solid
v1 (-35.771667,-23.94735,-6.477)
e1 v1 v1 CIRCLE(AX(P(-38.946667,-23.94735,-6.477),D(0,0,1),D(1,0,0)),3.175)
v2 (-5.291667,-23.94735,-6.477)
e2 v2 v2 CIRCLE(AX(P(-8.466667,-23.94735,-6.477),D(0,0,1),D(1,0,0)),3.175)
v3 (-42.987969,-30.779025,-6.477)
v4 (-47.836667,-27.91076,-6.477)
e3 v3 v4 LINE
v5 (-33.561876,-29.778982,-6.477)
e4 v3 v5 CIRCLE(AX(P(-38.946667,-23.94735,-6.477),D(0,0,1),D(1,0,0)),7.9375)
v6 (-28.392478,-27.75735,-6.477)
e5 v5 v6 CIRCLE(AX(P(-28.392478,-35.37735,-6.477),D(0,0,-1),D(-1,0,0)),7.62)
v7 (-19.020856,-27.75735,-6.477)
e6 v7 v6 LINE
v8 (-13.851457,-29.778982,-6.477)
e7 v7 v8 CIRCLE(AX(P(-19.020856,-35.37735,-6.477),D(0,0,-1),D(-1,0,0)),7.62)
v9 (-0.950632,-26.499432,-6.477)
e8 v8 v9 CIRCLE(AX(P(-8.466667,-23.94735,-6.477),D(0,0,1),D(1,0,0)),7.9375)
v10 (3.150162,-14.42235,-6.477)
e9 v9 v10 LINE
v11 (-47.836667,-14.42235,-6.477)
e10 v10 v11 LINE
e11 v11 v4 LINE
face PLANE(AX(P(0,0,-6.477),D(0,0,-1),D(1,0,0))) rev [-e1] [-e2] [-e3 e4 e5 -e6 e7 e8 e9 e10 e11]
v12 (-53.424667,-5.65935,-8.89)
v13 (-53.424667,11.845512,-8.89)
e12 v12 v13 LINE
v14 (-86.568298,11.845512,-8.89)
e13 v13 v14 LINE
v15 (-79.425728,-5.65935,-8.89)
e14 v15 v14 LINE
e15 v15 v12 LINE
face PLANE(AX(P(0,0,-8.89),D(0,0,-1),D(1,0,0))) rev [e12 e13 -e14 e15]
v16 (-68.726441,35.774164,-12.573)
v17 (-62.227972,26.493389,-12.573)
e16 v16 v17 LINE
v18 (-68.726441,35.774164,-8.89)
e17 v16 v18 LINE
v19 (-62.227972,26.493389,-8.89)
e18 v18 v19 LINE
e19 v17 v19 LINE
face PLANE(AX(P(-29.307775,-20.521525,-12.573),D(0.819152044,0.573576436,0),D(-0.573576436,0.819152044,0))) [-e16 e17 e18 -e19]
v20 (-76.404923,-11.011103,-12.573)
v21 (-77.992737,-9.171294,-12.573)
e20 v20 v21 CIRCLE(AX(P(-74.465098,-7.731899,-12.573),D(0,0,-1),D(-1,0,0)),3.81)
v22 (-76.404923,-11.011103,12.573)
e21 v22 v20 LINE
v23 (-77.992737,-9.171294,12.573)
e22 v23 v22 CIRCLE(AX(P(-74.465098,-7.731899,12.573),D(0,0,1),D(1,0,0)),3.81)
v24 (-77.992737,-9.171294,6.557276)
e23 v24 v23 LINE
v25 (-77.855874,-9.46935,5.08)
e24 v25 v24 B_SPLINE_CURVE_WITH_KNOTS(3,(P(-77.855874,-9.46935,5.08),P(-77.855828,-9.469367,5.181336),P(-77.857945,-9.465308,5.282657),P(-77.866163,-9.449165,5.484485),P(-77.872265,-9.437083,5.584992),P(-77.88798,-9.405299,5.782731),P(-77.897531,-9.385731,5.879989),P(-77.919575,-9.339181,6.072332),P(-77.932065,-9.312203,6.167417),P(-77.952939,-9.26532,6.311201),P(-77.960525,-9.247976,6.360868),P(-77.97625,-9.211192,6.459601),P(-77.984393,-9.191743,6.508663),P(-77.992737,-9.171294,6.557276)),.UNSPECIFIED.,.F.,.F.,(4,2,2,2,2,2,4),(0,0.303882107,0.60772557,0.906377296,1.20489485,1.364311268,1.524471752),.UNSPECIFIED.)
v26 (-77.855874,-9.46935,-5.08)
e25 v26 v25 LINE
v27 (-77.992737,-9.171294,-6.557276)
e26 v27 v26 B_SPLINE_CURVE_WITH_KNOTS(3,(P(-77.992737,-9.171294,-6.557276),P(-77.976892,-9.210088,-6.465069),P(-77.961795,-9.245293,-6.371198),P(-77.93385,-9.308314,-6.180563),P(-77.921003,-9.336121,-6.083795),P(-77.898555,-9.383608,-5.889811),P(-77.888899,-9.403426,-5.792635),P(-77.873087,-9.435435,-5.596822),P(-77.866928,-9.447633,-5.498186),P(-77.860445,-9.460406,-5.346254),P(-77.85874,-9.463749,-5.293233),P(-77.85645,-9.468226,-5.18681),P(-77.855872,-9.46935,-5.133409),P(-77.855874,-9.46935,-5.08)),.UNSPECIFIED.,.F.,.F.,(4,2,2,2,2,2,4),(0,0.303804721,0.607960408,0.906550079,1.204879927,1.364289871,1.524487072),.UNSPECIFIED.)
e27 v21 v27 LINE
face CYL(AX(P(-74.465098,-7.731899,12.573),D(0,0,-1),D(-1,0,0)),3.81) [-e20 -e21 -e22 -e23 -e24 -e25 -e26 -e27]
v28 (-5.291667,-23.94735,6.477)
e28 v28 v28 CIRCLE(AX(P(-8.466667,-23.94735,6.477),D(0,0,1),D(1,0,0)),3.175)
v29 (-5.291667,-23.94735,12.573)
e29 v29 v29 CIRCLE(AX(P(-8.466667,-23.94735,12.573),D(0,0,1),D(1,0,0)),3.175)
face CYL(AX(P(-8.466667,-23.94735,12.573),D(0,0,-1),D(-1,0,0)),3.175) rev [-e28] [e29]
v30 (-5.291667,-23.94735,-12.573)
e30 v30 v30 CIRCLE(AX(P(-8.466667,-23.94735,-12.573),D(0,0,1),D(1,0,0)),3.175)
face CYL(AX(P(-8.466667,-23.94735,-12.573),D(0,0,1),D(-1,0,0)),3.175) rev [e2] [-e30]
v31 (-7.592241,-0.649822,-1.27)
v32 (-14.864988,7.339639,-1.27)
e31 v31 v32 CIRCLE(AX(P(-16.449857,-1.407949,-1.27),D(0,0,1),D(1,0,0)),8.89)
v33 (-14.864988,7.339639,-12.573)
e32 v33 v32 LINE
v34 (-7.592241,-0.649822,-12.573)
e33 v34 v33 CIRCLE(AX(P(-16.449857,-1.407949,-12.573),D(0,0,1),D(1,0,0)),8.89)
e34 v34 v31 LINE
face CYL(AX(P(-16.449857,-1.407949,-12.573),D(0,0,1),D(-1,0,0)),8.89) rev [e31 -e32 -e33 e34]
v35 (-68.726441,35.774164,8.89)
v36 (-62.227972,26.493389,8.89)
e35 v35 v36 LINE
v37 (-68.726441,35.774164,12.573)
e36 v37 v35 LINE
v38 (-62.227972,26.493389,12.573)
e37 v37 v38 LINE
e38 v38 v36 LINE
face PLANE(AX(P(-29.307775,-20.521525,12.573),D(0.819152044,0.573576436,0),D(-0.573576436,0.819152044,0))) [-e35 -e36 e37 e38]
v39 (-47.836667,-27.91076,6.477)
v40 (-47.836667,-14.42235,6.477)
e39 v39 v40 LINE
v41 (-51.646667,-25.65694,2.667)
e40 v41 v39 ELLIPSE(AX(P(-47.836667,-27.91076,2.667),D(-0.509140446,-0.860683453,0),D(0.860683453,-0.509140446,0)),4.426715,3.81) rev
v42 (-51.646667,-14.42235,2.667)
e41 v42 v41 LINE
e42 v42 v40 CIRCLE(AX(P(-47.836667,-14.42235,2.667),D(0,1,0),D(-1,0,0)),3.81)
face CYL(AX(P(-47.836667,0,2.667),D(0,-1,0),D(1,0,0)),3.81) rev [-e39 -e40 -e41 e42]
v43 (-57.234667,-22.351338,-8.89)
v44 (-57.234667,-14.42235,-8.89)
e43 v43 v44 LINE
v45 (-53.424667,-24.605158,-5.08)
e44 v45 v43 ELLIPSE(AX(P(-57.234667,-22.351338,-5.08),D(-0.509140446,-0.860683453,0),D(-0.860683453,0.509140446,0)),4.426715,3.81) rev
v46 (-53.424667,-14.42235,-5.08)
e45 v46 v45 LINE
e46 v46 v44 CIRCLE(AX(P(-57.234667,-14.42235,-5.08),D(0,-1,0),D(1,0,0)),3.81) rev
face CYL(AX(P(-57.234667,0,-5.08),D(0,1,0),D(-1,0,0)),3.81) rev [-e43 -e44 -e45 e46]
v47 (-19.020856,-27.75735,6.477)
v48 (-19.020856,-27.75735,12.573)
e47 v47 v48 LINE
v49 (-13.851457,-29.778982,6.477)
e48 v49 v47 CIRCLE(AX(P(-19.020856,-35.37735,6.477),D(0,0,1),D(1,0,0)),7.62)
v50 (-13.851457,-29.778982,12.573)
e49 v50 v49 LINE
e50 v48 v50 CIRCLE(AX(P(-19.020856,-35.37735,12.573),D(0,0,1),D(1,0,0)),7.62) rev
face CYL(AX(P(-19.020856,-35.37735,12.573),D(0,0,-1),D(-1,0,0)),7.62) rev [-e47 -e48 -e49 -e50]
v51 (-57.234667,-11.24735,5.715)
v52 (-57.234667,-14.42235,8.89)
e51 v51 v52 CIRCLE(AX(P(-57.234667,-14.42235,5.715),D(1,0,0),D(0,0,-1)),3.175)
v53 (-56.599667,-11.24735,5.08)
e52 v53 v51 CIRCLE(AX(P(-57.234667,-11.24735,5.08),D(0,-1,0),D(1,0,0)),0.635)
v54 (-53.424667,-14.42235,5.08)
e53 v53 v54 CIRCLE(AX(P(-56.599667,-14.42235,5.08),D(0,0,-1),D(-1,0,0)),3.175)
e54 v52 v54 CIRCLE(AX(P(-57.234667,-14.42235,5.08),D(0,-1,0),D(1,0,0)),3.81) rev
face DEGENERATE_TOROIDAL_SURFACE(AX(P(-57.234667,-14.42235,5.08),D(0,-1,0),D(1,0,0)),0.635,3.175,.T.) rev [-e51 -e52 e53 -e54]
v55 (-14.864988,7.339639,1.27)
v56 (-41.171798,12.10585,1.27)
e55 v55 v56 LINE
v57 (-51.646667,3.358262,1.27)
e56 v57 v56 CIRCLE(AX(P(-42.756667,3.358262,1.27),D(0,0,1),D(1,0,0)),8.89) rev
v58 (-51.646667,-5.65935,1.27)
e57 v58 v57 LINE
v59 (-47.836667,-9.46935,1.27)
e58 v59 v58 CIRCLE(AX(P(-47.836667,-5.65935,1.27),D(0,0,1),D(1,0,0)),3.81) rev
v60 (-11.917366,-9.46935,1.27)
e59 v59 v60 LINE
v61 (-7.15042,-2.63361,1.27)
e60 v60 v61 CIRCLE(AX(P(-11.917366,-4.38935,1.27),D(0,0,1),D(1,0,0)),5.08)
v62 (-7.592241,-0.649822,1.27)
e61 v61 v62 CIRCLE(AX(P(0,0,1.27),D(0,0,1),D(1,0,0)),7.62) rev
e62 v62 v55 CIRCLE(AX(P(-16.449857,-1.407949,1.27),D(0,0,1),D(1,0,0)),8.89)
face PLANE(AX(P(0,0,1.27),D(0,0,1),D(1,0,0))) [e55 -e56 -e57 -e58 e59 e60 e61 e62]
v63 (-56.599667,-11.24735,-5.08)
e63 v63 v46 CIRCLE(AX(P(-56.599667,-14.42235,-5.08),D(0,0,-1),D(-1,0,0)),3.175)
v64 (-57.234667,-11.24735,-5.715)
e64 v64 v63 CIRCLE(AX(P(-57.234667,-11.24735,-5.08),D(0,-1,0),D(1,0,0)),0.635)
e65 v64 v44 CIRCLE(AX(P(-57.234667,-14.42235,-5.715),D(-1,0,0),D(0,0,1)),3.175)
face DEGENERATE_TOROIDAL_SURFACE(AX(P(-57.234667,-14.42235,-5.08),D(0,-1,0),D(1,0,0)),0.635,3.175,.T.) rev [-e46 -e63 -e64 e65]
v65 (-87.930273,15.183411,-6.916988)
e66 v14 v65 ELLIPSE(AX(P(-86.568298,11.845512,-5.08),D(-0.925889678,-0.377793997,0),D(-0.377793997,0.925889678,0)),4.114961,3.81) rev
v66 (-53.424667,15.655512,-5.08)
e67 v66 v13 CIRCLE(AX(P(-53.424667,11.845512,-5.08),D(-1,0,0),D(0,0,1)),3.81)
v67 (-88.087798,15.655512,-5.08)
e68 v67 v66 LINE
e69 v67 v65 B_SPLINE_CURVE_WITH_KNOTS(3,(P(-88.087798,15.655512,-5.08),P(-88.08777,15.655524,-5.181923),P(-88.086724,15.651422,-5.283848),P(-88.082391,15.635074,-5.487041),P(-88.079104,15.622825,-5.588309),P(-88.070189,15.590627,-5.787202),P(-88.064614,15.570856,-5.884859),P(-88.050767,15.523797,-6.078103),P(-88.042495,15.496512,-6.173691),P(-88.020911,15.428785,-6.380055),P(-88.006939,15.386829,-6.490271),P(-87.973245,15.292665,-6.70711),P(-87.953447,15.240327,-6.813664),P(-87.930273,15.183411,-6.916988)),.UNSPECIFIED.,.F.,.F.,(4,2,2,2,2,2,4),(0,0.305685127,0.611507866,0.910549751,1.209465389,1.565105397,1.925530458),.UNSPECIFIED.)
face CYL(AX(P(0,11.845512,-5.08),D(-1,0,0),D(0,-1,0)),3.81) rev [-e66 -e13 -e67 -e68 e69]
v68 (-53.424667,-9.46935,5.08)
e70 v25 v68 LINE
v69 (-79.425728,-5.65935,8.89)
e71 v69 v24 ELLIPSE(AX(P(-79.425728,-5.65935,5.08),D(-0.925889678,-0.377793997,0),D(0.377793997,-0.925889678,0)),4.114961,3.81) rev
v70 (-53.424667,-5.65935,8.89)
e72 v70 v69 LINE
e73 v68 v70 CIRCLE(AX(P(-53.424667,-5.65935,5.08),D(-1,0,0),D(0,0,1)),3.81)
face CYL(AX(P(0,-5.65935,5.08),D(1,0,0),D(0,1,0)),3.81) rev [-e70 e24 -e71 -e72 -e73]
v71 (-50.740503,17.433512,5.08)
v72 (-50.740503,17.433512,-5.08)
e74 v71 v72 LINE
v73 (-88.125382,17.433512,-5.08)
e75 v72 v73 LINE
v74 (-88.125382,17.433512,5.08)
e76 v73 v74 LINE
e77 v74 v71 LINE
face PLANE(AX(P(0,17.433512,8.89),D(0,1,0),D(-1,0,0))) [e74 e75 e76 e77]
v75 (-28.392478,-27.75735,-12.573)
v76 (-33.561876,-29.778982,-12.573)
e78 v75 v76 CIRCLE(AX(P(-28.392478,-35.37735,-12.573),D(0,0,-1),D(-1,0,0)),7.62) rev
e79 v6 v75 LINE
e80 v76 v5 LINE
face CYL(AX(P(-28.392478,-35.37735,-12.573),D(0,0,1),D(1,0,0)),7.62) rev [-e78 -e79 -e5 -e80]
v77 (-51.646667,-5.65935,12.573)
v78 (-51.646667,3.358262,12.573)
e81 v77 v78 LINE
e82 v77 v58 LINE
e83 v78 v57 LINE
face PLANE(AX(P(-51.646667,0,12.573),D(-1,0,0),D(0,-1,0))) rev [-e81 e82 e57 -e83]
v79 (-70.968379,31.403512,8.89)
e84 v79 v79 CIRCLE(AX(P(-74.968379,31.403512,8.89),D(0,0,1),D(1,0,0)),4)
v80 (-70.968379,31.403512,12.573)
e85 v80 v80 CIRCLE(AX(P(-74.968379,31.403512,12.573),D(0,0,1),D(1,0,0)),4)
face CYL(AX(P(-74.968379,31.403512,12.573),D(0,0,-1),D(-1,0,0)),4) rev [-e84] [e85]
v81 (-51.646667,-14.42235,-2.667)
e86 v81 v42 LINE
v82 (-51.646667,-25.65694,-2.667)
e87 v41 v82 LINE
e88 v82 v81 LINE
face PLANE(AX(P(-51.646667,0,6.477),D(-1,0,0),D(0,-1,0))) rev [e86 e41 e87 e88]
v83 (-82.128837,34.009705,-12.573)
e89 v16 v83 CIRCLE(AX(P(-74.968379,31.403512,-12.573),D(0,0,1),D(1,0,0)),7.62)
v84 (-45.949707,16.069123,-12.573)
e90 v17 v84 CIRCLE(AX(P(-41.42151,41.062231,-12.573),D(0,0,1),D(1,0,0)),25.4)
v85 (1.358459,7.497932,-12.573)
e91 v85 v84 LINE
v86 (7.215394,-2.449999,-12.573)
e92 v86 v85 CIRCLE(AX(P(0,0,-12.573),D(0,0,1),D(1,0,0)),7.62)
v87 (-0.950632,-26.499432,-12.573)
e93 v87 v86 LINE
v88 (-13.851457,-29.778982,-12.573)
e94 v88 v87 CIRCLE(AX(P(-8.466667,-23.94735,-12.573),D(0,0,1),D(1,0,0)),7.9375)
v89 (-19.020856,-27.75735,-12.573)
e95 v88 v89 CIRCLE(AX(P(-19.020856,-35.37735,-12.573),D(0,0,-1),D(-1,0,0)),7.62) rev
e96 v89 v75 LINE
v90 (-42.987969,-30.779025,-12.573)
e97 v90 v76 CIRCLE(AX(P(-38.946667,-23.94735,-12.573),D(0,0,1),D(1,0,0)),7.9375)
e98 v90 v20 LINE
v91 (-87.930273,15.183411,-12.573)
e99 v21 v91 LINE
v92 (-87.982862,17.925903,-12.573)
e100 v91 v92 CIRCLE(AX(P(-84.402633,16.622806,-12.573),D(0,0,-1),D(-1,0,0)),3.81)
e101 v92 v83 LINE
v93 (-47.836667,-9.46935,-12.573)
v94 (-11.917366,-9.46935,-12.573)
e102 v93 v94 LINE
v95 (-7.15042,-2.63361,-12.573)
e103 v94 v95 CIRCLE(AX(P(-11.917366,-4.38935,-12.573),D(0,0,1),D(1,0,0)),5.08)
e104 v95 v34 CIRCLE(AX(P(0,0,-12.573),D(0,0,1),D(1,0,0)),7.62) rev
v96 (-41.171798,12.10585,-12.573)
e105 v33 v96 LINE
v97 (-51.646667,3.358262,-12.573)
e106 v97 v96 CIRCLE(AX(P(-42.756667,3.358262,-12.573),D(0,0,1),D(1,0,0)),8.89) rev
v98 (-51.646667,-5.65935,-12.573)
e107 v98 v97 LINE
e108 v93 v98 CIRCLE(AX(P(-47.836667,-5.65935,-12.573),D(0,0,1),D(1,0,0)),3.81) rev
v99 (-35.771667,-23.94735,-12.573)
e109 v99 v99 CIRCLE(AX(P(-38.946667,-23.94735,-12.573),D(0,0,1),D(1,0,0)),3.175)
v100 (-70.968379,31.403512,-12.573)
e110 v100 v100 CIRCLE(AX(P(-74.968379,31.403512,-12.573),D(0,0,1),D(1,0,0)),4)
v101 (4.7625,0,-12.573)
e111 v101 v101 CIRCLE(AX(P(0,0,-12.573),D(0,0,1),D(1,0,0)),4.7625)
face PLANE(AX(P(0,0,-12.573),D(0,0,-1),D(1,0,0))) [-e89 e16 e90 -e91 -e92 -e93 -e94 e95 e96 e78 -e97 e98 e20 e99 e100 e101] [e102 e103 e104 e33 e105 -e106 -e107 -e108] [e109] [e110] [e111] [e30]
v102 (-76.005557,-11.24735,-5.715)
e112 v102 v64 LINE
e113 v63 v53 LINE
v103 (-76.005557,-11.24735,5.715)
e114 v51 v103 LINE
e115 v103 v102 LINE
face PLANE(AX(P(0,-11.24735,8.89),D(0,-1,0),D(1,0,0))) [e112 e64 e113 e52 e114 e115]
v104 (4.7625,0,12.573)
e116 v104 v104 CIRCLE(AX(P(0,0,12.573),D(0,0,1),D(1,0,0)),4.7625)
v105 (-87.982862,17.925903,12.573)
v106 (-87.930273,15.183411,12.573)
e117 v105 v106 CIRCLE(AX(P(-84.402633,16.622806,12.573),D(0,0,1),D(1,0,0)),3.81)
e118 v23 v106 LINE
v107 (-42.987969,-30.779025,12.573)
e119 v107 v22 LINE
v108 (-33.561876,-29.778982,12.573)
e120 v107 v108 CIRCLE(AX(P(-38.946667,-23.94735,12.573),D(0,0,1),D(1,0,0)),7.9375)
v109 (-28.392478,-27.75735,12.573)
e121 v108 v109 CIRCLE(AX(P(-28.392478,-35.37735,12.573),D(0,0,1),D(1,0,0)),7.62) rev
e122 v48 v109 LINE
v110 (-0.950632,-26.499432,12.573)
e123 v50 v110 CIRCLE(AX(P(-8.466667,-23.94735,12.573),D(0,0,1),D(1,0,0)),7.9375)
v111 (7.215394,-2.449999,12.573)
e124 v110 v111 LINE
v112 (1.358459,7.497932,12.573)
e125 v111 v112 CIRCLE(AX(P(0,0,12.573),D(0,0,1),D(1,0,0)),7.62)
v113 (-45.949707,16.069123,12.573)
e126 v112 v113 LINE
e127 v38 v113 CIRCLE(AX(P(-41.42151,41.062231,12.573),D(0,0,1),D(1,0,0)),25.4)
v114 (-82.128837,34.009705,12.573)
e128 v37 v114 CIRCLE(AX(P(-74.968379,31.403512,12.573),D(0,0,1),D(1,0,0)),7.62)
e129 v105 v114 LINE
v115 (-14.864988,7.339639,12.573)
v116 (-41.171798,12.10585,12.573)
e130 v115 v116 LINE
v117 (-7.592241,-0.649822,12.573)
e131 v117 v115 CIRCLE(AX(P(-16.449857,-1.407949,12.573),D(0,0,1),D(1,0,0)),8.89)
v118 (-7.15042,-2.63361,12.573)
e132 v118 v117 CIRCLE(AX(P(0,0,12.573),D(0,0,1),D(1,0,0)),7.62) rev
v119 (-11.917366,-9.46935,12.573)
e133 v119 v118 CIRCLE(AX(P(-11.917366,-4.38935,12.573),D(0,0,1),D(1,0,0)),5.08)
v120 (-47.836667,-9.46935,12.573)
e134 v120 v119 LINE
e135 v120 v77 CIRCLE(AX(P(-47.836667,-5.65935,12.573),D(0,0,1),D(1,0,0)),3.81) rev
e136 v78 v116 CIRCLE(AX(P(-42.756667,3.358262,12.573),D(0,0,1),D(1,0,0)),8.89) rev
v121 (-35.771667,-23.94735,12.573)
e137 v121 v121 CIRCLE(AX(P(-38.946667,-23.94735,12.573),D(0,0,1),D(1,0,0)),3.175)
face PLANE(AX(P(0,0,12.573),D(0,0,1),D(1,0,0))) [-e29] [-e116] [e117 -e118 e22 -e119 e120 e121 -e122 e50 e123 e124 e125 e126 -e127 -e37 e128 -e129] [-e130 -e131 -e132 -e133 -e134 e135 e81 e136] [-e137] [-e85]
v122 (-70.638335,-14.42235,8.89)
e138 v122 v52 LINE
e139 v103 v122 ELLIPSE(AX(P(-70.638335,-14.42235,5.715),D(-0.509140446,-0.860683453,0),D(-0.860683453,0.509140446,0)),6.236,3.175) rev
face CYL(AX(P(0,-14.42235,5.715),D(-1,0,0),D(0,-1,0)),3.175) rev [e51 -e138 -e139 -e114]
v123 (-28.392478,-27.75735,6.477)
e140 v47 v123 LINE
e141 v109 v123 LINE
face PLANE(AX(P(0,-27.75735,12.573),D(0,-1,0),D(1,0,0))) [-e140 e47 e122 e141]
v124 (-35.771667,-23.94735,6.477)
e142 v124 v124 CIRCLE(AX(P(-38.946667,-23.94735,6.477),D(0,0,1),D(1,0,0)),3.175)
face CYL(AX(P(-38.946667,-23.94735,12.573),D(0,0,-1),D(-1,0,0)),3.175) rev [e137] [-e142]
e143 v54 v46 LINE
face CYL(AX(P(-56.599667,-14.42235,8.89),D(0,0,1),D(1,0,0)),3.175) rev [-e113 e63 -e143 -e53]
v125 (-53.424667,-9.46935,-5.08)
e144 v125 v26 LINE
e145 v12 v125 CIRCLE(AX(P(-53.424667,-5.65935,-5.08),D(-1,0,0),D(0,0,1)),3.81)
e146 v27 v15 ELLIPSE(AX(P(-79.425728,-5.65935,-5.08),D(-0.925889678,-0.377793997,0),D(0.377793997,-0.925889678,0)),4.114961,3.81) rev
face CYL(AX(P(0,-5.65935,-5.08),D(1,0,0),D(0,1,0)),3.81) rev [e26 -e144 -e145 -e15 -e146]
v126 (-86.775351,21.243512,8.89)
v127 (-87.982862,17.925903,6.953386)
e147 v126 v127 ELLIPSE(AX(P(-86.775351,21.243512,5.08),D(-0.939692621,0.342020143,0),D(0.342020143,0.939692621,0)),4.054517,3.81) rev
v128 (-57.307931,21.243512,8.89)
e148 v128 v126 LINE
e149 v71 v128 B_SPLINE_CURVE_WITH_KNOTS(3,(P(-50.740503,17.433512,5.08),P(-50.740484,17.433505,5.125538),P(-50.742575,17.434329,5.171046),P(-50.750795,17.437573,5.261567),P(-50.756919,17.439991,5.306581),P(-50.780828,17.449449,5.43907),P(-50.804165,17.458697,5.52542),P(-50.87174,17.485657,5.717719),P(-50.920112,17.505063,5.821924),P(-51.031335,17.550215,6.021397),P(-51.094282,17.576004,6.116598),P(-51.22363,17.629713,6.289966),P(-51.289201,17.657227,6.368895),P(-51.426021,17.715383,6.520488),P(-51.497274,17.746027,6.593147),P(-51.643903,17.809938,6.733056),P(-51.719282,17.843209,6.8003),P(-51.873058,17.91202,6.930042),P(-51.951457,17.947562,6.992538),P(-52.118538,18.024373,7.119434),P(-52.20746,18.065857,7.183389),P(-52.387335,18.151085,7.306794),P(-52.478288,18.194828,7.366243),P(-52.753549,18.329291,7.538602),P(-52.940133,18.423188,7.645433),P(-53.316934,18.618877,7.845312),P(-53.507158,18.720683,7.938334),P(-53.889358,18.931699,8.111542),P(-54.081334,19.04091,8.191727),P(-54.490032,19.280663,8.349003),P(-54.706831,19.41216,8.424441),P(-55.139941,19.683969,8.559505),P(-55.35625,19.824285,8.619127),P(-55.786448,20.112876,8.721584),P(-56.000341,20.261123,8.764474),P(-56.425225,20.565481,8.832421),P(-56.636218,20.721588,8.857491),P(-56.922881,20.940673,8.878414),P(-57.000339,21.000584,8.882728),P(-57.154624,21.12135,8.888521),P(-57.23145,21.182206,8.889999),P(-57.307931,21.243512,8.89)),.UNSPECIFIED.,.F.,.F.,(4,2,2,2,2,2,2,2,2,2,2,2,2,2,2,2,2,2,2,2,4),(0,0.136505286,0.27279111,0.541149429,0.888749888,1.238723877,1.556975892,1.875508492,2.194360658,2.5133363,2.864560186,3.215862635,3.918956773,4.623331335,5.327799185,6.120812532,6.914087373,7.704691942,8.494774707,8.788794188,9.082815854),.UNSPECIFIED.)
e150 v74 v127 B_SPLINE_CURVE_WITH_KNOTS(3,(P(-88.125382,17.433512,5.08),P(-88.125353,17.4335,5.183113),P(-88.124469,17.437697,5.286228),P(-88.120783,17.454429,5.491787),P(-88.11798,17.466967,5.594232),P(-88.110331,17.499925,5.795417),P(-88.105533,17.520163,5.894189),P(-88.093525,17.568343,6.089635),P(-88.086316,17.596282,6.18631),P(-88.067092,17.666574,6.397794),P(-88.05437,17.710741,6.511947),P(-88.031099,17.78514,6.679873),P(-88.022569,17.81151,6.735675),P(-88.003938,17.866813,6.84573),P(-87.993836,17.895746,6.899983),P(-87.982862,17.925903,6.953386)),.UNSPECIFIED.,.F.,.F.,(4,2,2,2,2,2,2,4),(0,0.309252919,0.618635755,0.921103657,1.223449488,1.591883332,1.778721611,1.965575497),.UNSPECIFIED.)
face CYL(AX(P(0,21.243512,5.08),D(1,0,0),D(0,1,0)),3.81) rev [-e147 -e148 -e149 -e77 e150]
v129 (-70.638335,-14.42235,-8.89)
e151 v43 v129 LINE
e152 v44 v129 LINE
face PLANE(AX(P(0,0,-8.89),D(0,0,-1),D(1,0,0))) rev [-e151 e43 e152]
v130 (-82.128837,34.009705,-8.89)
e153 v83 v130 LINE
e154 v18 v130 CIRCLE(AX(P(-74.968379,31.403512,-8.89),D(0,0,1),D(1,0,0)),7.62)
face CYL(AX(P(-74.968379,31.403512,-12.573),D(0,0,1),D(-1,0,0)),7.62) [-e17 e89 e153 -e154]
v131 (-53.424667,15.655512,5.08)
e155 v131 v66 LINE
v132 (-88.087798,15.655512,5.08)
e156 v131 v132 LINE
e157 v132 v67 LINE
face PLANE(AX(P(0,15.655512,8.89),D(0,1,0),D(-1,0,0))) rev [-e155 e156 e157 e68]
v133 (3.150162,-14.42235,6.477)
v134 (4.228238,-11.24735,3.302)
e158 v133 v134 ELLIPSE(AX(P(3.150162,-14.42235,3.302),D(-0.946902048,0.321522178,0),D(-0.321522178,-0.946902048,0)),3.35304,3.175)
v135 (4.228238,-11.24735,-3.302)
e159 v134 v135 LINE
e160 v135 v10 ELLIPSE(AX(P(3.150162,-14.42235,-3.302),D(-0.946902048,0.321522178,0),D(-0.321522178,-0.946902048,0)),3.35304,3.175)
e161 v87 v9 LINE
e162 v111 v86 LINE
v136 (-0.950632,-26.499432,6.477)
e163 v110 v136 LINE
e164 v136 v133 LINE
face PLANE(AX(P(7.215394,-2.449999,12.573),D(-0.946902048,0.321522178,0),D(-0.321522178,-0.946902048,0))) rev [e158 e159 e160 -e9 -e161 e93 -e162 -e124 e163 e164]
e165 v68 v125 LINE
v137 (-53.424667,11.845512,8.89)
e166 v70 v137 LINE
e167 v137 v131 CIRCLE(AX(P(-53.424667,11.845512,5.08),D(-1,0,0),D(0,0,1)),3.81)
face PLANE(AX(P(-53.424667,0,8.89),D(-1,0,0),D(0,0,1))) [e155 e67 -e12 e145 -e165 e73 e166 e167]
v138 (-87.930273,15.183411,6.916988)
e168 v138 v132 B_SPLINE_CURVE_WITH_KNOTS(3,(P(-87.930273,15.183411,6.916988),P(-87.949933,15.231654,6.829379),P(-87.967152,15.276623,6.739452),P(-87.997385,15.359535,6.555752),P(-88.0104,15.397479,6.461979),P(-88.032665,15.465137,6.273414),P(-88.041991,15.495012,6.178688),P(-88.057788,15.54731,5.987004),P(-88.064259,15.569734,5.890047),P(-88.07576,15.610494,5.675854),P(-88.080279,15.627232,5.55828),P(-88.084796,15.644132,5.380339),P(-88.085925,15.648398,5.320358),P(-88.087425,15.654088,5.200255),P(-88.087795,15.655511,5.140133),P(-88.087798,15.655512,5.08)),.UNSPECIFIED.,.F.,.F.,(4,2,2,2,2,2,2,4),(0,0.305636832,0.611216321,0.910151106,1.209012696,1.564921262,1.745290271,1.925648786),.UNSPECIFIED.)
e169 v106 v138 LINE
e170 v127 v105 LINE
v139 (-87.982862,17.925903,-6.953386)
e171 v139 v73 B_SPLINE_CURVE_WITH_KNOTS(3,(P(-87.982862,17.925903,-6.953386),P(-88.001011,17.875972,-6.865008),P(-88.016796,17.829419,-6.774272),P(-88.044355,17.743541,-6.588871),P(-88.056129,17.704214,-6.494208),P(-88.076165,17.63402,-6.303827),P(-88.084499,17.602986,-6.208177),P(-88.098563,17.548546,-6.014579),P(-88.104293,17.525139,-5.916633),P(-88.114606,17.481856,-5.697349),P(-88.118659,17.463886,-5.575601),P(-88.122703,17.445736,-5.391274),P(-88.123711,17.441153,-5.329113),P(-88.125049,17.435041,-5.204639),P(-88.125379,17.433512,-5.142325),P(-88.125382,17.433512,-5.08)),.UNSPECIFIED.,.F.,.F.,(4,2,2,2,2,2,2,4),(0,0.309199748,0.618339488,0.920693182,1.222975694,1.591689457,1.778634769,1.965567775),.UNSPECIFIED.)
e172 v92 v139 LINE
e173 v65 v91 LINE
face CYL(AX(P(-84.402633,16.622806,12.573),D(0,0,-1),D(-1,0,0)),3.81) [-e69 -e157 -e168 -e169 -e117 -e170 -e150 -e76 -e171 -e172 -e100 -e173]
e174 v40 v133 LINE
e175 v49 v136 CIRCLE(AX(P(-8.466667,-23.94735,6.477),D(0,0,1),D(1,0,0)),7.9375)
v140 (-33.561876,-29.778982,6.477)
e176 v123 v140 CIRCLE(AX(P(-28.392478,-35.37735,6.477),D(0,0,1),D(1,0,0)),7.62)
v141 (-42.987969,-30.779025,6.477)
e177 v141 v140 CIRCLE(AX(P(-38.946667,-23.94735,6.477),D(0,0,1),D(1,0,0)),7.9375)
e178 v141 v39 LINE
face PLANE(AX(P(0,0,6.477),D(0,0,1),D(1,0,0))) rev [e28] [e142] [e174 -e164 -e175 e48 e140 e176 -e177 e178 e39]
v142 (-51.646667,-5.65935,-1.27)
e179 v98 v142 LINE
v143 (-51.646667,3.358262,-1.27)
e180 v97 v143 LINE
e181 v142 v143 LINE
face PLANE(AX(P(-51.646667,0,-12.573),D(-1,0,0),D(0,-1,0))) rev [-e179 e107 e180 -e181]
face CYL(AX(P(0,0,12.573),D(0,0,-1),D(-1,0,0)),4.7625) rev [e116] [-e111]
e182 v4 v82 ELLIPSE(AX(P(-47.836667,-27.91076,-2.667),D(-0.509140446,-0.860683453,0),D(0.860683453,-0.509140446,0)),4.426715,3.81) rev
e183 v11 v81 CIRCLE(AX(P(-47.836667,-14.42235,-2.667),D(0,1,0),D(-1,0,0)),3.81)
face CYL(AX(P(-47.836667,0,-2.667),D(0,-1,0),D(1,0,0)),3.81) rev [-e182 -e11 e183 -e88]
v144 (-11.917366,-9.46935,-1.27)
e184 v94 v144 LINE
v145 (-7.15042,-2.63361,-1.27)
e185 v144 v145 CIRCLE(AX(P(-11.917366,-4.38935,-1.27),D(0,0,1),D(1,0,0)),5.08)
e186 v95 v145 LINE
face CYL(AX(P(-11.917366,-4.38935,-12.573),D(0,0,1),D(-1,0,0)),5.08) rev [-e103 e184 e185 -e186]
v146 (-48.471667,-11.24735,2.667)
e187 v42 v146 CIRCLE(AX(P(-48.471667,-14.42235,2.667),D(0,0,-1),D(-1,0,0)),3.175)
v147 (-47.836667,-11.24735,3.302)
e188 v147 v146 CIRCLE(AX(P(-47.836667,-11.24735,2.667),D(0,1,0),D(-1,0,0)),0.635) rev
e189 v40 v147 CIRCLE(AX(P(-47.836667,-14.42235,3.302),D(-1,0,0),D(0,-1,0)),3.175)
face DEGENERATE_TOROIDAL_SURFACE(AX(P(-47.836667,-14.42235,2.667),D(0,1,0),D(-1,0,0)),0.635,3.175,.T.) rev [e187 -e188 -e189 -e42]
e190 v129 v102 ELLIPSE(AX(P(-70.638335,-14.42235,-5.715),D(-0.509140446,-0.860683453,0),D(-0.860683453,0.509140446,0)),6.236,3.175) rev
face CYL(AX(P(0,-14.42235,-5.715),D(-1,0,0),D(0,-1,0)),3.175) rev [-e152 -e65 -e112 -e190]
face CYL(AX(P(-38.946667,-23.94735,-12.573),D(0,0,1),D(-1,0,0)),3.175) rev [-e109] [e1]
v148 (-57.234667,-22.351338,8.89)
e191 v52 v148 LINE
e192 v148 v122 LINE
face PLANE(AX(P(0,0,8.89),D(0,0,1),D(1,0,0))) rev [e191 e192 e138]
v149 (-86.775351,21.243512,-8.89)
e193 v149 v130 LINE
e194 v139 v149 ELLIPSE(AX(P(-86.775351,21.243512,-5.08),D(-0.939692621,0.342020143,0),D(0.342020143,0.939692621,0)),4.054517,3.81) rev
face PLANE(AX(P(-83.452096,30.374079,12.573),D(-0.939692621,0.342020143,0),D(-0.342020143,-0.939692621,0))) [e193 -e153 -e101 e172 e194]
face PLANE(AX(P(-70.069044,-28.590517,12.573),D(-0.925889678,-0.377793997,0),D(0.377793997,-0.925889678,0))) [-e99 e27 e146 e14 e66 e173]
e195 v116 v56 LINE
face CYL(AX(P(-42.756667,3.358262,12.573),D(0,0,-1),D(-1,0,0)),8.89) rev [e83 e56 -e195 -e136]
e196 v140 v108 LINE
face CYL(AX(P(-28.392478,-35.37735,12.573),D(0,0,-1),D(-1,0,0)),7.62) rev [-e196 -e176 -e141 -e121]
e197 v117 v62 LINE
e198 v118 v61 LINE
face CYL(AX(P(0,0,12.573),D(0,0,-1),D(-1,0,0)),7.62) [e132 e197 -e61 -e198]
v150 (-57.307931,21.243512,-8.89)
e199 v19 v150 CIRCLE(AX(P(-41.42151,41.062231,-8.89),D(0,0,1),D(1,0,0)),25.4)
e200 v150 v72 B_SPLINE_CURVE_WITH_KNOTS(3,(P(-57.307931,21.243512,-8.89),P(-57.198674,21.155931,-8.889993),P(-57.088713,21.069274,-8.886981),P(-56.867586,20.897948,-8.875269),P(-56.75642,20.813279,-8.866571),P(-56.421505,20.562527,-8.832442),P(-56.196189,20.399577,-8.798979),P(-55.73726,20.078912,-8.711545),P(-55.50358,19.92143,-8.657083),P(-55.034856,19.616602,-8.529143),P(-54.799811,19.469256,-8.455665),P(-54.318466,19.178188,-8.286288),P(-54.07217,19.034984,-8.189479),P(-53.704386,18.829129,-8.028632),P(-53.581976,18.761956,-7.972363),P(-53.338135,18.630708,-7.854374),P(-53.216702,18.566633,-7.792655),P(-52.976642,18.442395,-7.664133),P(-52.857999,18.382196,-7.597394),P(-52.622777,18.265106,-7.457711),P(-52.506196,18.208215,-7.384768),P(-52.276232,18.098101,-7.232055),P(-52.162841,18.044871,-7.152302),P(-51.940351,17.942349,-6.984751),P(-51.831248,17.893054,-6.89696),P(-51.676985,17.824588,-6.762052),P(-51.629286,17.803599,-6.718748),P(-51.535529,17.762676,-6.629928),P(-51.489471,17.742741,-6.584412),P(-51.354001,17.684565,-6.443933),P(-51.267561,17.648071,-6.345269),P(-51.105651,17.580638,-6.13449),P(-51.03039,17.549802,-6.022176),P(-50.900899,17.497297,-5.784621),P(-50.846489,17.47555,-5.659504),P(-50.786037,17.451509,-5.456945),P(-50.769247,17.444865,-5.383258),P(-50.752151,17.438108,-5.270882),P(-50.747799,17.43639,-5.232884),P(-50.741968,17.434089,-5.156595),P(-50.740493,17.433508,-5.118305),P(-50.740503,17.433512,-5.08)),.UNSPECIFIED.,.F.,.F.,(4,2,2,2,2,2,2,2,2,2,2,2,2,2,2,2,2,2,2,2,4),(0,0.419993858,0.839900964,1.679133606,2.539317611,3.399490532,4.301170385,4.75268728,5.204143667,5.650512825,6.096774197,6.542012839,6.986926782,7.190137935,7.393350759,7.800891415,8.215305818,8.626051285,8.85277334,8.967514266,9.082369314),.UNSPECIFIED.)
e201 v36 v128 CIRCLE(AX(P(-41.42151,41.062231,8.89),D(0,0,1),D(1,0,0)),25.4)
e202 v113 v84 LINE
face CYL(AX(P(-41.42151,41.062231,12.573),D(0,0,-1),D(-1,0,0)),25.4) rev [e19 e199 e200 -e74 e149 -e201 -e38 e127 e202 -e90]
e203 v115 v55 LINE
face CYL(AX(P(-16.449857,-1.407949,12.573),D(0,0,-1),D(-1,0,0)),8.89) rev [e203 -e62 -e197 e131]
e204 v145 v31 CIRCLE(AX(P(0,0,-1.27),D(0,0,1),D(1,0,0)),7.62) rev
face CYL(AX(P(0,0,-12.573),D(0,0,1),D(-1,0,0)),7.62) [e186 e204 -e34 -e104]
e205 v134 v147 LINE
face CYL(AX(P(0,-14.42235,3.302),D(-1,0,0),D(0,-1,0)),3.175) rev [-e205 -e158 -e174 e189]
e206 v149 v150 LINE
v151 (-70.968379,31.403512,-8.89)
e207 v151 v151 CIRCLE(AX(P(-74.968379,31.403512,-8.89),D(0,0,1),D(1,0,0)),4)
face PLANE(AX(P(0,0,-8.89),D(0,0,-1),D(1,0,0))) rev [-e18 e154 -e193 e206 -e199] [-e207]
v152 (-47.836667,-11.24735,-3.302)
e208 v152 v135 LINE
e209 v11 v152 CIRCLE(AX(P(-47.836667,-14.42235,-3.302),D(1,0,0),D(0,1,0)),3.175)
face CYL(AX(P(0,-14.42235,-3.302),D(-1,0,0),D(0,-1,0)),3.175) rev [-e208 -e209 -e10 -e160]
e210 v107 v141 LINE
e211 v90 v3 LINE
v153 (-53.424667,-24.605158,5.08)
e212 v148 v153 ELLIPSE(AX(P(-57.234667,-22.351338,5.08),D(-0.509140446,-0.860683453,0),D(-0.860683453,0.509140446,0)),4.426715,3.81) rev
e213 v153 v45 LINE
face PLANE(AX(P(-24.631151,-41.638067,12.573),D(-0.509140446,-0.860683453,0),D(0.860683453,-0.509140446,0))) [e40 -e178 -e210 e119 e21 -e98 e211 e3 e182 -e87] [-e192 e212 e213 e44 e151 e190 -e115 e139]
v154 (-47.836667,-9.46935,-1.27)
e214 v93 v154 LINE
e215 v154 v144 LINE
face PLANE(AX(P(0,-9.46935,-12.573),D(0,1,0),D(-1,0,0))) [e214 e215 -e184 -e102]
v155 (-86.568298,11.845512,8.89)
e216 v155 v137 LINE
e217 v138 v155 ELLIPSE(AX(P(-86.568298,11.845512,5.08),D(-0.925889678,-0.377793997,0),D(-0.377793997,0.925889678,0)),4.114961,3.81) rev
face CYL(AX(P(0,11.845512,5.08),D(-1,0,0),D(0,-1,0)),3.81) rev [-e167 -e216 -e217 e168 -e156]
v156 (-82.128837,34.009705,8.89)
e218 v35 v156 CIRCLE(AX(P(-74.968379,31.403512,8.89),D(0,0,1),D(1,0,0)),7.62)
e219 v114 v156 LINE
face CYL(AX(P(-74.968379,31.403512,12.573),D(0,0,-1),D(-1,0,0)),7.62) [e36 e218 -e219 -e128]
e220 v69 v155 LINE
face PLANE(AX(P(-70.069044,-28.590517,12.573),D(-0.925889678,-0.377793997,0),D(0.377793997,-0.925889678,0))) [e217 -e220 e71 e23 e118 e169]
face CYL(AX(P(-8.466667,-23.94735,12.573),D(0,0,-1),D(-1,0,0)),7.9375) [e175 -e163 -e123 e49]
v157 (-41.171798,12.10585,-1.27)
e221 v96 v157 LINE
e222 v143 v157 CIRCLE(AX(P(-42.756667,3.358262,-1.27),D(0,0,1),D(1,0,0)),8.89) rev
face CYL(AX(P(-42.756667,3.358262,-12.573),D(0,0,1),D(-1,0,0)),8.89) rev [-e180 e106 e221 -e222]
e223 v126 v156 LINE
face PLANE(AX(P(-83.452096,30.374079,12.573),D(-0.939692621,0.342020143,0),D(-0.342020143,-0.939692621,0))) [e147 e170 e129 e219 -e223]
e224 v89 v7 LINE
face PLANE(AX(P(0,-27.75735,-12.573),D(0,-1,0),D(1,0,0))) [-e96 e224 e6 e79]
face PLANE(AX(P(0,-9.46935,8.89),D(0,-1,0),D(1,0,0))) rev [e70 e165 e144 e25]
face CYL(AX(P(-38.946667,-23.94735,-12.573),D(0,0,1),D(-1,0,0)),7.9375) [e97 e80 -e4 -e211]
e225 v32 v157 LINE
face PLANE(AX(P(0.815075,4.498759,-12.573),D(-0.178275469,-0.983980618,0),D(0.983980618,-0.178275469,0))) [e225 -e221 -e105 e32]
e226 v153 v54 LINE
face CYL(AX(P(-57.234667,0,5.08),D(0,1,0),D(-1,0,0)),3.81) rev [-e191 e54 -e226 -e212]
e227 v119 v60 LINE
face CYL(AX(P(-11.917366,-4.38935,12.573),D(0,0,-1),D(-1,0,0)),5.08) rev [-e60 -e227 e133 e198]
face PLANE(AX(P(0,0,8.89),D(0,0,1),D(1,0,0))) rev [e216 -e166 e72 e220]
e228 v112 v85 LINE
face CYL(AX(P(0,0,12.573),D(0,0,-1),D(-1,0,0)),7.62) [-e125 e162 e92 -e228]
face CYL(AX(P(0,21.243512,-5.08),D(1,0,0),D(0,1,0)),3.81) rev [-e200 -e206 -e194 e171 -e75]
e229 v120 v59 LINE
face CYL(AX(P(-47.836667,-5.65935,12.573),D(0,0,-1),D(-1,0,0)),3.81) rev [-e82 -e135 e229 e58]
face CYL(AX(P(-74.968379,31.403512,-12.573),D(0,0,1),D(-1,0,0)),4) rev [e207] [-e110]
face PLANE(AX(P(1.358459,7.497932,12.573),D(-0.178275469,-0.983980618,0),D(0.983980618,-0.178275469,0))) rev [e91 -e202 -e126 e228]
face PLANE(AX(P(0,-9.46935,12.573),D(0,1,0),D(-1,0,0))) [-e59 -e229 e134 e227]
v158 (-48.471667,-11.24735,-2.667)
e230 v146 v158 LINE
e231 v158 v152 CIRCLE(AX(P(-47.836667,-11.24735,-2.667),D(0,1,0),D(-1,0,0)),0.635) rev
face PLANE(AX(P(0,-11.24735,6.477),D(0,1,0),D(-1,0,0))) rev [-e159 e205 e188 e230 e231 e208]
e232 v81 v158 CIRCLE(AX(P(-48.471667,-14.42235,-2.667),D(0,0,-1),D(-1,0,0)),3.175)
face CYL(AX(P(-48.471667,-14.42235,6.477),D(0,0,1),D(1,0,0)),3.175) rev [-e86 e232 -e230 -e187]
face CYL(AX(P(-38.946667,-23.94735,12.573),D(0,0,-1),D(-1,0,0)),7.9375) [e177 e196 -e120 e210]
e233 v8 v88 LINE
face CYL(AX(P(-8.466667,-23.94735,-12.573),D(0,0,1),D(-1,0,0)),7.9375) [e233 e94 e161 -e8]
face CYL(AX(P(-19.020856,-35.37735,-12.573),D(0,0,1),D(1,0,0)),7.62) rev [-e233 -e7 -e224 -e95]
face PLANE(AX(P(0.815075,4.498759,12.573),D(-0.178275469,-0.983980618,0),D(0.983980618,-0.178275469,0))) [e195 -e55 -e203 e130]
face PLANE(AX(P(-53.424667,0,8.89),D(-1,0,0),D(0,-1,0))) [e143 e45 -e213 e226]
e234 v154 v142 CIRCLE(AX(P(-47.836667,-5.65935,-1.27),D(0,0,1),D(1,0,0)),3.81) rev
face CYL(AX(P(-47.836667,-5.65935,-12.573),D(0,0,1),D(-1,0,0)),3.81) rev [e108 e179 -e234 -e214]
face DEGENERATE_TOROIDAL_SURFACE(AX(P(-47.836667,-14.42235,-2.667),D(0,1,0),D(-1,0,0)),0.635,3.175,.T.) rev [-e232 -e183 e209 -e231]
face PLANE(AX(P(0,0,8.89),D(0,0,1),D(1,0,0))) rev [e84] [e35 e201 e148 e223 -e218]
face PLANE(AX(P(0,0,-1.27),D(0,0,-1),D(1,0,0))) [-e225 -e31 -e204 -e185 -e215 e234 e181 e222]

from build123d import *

# Parameters (mm, degrees)
SKETCH1_R           = 4.7625
SKETCH1_R_2         = 4
SKETCH1_R_3         = 3.175
BOSS_EXTRUDE1_DEPTH = 12.573
BOSS_EXTRUDE2_DEPTH = 1.27
SKETCH1_6_R         = 3.175
CUT_EXTRUDE1_DEPTH  = 6.477
SKETCH1_10_R        = 4
CUT_EXTRUDE3_DEPTH  = 8.89
FILLET1_R           = 3.81
FILLET3_R           = 3.81
FILLET4_R           = 3.175
FILLET5_R           = 7.62


with BuildPart() as part:
    # Sketch1 → Boss-Extrude1 (new body)
    with BuildSketch(Plane(origin=(0, 0, 0), x_dir=(0, 1, 0), z_dir=(0, 0, 1))):
        with BuildLine():
            Line((-26.499431941, 0.950631657), (-2.449998994, -7.215393609))
            ThreePointArc((-2.449998994, -7.215393609), (3.866048142, -6.56643524), (7.497932311, -1.358459074))
            Line((7.497932311, -1.358459074), (16.069122988, 45.94970705))
            ThreePointArc((16.069122988, 45.94970705), (19.672222889, 55.119231342), (26.493389209, 62.227972063))
            Line((26.493389209, 62.227972063), (35.774163974, 68.726440514))
            ThreePointArc((35.774163974, 68.726440514), (38.958321373, 75.962988676), (34.009705021, 82.128836862))
            Line((34.009705021, 82.128836862), (16.544511529, 88.485647429))
            Line((16.544511529, 88.485647429), (-10.358349656, 77.508379092))
            Line((-10.358349656, 77.508379092), (-30.779024566, 42.987968953))
            ThreePointArc((-30.779024566, 42.987968953), (-31.601546647, 36.844959103), (-27.757349656, 31.983348043))
            Line((-27.757349656, 31.983348043), (-27.757349656, 15.42998529))
            ThreePointArc((-27.757349656, 15.42998529), (-31.855063811, 7.779670964), (-26.499431941, 0.950631657))
        make_face()
        with Locations(Location((0, 0, 0), (0, 0, 270))):
            Circle(SKETCH1_R, mode=Mode.SUBTRACT)
        with Locations(Location((31.403511529, 74.968379092, 0), (0, 0, 270))):
            Circle(SKETCH1_R_2, mode=Mode.SUBTRACT)
        with Locations(Location((-23.947349656, 38.946666667, 0), (0, 0, 270))):
            Circle(SKETCH1_R_3, mode=Mode.SUBTRACT)
        with Locations(Location((-23.947349656, 8.466666667, 0), (0, 0, 270))):
            Circle(SKETCH1_R_3, mode=Mode.SUBTRACT)
        with BuildLine():
            Line((-9.469349656, 47.836666667), (-9.469349656, 11.917365883))
            ThreePointArc((-9.469349656, 11.917365883), (-7.295140555, 7.750499045), (-2.633609794, 7.15041953))
            ThreePointArc((-2.633609794, 7.15041953), (-1.656512431, 7.437766235), (-0.649822418, 7.592241489))
            ThreePointArc((-0.649822418, 7.592241489), (4.576435948, 9.875722251), (7.339639123, 14.86498764))
            Line((7.339639123, 14.86498764), (12.10584978, 41.171797748))
            ThreePointArc((12.10584978, 41.171797748), (10.181808987, 48.455026751), (3.358262084, 51.646666667))
            Line((3.358262084, 51.646666667), (-5.659349656, 51.646666667))
            ThreePointArc((-5.659349656, 51.646666667), (-8.353426493, 50.530743503), (-9.469349656, 47.836666667))
        make_face(mode=Mode.SUBTRACT)
    extrude(amount=BOSS_EXTRUDE1_DEPTH)

    # Sketch1<4> → Boss-Extrude2 (add)
    with BuildSketch(Plane(origin=(0, 0, 0), x_dir=(0, 1, 0), z_dir=(0, 0, 1))):
        with BuildLine():
            ThreePointArc((-5.659349656, 51.646666667), (-8.353426493, 50.530743503), (-9.469349656, 47.836666667))
            Line((-9.469349656, 47.836666667), (-9.469349656, 11.917365883))
            ThreePointArc((-9.469349656, 11.917365883), (-7.295140555, 7.750499045), (-2.633609794, 7.15041953))
            ThreePointArc((-2.633609794, 7.15041953), (-1.656512431, 7.437766235), (-0.649822418, 7.592241489))
            ThreePointArc((-0.649822418, 7.592241489), (4.576435948, 9.875722251), (7.339639123, 14.86498764))
            Line((7.339639123, 14.86498764), (12.10584978, 41.171797748))
            ThreePointArc((12.10584978, 41.171797748), (10.181808987, 48.455026751), (3.358262084, 51.646666667))
            Line((3.358262084, 51.646666667), (-5.659349656, 51.646666667))
        make_face()
    extrude(amount=BOSS_EXTRUDE2_DEPTH)

    # Sketch1<6> → Cut-Extrude1 (cut)
    with BuildSketch(Plane(origin=(0, 0, 0), x_dir=(0, 1, 0), z_dir=(0, 0, 1))):
        with BuildLine():
            ThreePointArc((-27.757349656, 15.42998529), (-31.855063811, 7.779670964), (-26.499431941, 0.950631657))
            Line((-26.499431941, 0.950631657), (-11.247349656, -4.228238446))
            Line((-11.247349656, -4.228238446), (-11.247349656, 51.646666667))
            Line((-11.247349656, 51.646666667), (-25.656940256, 51.646666667))
            Line((-25.656940256, 51.646666667), (-30.779024566, 42.987968953))
            ThreePointArc((-30.779024566, 42.987968953), (-31.601546647, 36.844959103), (-27.757349656, 31.983348043))
            Line((-27.757349656, 31.983348043), (-27.757349656, 15.42998529))
        make_face()
        with Locations(Location((-23.947349656, 8.466666667, 0), (0, 0, 270))):
            Circle(SKETCH1_6_R, mode=Mode.SUBTRACT)
        with Locations(Location((-23.947349656, 38.946666667, 0), (0, 0, 270))):
            Circle(SKETCH1_6_R, mode=Mode.SUBTRACT)
    extrude(amount=CUT_EXTRUDE1_DEPTH, mode=Mode.SUBTRACT)

    # Sketch1<10> → Cut-Extrude3 (cut)
    # profile 1 of 3: a face of its own
    with BuildSketch(Plane(origin=(0, 0, 0), x_dir=(0, 1, 0), z_dir=(0, 0, 1))):
        with BuildLine():
            Line((17.433511529, 88.162077891), (17.433511529, 50.740503147))
            ThreePointArc((17.433511529, 50.740503147), (21.118462359, 57.150658387), (26.493389209, 62.227972063))
            Line((26.493389209, 62.227972063), (35.774163974, 68.726440514))
            ThreePointArc((35.774163974, 68.726440514), (38.958321373, 75.962988676), (34.009705021, 82.128836862))
            Line((34.009705021, 82.128836862), (17.433511529, 88.162077891))
        make_face()
        with Locations(Location((31.403511529, 74.968379092, 0), (0, 0, 270))):
            Circle(SKETCH1_10_R, mode=Mode.SUBTRACT)
    # profile 2 of 3: a face of its own
    with BuildSketch(Plane(origin=(0, 0, 0), x_dir=(0, 1, 0), z_dir=(0, 0, 1))):
        Polygon((-11.247349656, 76.005556842), (-24.605157851, 53.424666667), (-11.247349656, 53.424666667), align=None)
    # profile 3 of 3: a face of its own
    with BuildSketch(Plane(origin=(0, 0, 0), x_dir=(0, 1, 0), z_dir=(0, 0, 1))):
        Polygon((15.655511529, 88.122905656), (-9.469349656, 77.871120864), (-9.469349656, 53.424666667), (15.655511529, 53.424666667), align=None)
    extrude(amount=CUT_EXTRUDE3_DEPTH, mode=Mode.SUBTRACT)

    # Mirror1: part across face


with BuildPart() as part_1:
    add(part.part)
    add(part.part.mirror(Plane(origin=(-30.744300958, 0.707665305, 0), x_dir=(1, 0, 0), z_dir=(0, 0, -1))))

    # Fillet1
    fillet1_edges = [part_1.edges().sort_by_distance(p)[0] for p in [
        (-69.451290519, 17.433511529, 8.89),
        (-51.646666667, -18.452144956, 6.477),
        (-51.646666667, -18.452144956, -6.477),
        (-53.424666667, -17.926253754, 8.89),
        (-53.424666667, -17.926253754, -8.89),
        (-70.773786162, 15.655511529, 8.89),
        (-65.647893765, -9.469349656, 8.89),
        (-65.647893765, -9.469349656, -8.89),
        (-70.773786162, 15.655511529, -8.89),
        (-69.451290519, 17.433511529, -8.89),
    ]]
    fillet(fillet1_edges, radius=FILLET1_R)

    # Fillet3
    # the kernel refuses this fillet: 3.81 mm, written as the material it takes off along each edge
    with BuildSketch(Plane(origin=(-77.508379092, -10.358349656, -15.77817458), x_dir=(-0.3777939966211631, 0.9258896781566412, 0), z_dir=(0, 0, 1))) as fillet3_piece_1:
        with BuildLine():
            CenterArc((FILLET3_R * 0.336501268256, -FILLET3_R), FILLET3_R, 90, 37.196303294)
            Line((-FILLET3_R * 0.268046453486, -FILLET3_R * 0.203431075087), (0, 0))
            Line((0, 0), (FILLET3_R * 0.336501268256, 0))
        make_face()
    extrude(amount=31.55634916, mode=Mode.SUBTRACT)
    with BuildSketch(Plane(origin=(-88.485647429, 16.544511529, -16.248115103), x_dir=(0.3420201433256622, 0.9396926207859108, 0), z_dir=(0, 0, 1))) as fillet3_piece_2:
        with BuildLine():
            CenterArc((FILLET3_R * 0.385838855973, -FILLET3_R), FILLET3_R, 90, 42.197104506)
            Line((-FILLET3_R * 0.285844295256, -FILLET3_R * 0.259161458646), (0, 0))
            Line((0, 0), (FILLET3_R * 0.385838855973, 0))
        make_face()
    extrude(amount=32.496230206, mode=Mode.SUBTRACT)

    # Fillet4
    fillet4_edges = [part_1.edges().sort_by_distance(p)[0] for p in [
        (-53.424666667, -11.247349656, 0),
        (-66.620111754, -11.247349656, -8.89),
        (-66.620111754, -11.247349656, 8.89),
        (-54.54058983, -11.247349656, -7.774076836),
        (-54.54058983, -11.247349656, 7.774076836),
        (-21.80421411, -11.247349656, 6.477),
        (-51.646666667, -11.247349656, 0),
        (-21.80421411, -11.247349656, -6.477),
        (-50.530743503, -11.247349656, -5.361076836),
        (-50.530743503, -11.247349656, 5.361076836),
    ]]
    fillet(fillet4_edges, radius=FILLET4_R)

    # Fillet5
    fillet5_edges = [part_1.edges().sort_by_distance(p)[0] for p in [
        (-31.983348043, -27.757349656, -9.525),
        (-15.42998529, -27.757349656, -9.525),
        (-15.42998529, -27.757349656, 9.525),
        (-31.983348043, -27.757349656, 9.525),
    ]]
    fillet(fillet5_edges, radius=FILLET5_R)


solid = part_1.part
